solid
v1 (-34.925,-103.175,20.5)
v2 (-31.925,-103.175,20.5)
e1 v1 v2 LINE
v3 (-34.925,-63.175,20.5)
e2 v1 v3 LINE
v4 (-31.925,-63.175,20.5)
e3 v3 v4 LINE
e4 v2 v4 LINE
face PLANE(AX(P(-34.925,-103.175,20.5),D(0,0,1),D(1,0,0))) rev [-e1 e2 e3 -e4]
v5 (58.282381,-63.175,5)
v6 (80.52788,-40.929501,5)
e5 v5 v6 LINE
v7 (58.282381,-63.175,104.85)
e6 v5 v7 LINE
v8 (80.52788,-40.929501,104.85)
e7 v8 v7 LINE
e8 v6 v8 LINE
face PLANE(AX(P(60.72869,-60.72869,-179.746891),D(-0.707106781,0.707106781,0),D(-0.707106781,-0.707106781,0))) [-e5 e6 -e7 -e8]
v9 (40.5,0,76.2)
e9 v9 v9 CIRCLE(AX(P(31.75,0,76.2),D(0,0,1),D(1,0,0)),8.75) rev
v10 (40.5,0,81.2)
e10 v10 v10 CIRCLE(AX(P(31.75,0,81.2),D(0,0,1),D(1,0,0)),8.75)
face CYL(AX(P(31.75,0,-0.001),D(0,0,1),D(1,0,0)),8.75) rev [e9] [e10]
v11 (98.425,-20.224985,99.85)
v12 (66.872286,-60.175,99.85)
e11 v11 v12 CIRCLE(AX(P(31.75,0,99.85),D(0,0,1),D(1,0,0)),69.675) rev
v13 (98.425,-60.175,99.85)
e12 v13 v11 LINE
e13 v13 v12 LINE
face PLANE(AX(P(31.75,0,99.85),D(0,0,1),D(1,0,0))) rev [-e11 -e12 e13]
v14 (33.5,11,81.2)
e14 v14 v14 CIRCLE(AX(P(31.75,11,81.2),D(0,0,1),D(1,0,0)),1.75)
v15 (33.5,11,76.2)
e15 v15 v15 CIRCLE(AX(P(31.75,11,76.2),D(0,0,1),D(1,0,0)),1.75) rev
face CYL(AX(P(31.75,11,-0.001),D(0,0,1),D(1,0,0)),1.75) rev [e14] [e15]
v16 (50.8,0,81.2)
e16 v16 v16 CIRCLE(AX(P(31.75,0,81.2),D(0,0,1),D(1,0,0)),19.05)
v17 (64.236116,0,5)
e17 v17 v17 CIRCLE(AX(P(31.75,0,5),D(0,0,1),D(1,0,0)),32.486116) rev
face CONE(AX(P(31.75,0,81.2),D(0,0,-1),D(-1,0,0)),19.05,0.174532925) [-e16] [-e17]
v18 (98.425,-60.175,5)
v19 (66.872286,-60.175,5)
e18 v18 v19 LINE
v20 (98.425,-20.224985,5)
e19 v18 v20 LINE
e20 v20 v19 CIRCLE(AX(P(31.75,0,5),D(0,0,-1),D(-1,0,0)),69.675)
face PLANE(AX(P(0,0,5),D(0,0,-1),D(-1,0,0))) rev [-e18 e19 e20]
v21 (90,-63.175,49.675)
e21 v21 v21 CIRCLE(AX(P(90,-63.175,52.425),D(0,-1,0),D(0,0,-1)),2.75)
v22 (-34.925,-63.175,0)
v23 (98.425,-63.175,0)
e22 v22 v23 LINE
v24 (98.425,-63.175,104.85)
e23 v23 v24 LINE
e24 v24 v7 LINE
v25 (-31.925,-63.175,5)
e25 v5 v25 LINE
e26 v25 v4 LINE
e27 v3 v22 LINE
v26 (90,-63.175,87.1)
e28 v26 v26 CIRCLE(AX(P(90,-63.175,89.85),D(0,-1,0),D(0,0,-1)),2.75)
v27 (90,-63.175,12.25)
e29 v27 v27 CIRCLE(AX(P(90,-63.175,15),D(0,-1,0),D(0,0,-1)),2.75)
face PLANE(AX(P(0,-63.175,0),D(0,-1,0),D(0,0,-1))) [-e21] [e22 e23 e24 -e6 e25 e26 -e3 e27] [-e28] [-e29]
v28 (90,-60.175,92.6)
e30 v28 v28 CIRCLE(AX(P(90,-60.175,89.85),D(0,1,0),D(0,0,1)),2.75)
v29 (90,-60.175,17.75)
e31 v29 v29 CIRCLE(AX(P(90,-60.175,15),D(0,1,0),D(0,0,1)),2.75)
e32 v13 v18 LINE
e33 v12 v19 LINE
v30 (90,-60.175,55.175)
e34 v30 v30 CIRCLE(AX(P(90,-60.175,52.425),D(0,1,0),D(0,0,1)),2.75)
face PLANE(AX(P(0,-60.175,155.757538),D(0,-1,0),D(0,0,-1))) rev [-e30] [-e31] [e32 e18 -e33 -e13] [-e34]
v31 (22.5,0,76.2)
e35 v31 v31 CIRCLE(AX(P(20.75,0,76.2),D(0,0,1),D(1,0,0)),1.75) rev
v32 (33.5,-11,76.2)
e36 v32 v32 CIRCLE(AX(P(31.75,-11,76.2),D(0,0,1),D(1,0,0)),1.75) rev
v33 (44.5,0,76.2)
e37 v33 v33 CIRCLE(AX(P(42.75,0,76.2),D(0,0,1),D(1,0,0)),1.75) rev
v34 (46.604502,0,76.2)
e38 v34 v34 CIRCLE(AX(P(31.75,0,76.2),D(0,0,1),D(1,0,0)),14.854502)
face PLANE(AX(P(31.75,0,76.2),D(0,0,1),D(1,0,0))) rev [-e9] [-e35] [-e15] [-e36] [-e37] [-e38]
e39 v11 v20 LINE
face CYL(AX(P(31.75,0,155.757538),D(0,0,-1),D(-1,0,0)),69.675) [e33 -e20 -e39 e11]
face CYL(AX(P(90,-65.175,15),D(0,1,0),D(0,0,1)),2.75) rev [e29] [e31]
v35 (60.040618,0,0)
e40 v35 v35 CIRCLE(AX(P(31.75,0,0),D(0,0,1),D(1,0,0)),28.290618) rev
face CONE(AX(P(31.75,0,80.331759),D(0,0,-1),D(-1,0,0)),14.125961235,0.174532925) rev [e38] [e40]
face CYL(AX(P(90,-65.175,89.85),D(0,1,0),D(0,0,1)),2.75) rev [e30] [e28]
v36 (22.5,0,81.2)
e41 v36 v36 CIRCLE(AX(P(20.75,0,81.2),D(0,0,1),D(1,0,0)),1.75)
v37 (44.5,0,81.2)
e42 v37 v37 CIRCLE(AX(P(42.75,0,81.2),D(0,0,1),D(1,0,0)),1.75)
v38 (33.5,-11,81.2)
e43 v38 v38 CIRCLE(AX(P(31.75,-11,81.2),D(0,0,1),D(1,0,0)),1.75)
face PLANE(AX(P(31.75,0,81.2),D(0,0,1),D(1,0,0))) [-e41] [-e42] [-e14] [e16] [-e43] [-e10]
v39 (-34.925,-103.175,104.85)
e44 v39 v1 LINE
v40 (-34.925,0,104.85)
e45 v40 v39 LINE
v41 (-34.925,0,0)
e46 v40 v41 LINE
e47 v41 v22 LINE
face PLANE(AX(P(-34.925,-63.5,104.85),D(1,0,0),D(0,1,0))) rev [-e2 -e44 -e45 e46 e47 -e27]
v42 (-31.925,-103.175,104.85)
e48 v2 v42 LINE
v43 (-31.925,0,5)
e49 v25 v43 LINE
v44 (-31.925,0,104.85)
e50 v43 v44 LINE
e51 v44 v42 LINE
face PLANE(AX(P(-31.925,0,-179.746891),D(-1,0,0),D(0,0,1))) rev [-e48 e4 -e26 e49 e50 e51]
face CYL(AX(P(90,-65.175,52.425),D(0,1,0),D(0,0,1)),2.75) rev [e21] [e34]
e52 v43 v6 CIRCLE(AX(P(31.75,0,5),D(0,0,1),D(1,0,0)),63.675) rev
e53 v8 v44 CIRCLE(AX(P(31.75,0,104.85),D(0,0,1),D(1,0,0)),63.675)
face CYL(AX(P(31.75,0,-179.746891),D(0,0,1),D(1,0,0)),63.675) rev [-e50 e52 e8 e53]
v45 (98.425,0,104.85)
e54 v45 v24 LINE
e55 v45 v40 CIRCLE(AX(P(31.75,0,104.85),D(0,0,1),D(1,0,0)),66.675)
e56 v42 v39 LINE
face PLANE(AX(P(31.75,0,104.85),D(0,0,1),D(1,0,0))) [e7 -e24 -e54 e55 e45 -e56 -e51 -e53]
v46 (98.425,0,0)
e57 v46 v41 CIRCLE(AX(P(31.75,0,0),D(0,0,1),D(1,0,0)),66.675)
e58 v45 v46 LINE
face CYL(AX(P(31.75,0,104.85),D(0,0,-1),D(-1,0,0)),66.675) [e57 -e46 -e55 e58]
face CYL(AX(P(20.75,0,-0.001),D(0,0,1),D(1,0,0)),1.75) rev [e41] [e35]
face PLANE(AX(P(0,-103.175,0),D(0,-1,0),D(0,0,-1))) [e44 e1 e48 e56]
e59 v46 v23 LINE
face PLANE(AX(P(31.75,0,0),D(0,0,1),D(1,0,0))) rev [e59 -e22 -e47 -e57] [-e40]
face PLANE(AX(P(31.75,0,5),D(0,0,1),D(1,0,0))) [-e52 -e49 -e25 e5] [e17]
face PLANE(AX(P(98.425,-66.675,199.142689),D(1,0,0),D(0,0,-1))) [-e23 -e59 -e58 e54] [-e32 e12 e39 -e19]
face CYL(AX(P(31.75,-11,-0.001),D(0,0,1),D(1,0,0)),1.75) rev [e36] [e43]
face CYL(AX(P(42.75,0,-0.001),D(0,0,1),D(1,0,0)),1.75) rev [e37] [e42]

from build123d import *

# Parameters (mm, degrees)
BOSS_EXTRUDE1_DEPTH = 104.85
CUT_EXTRUDE1_REACH  = 178.992
CUT_EXTRUDE2_REACH  = 178.992
SKETCH3_R           = 2.665000000000001
BOSS_EXTRUDE2_DEPTH = 104.85
CUT_EXTRUDE3_REACH  = 178.992
SKETCH6_W           = 66.67499999999998
SKETCH6_H           = 36.500000000000014
CUT_EXTRUDE4_DEPTH  = 3.5
CUT_EXTRUDE5_DEPTH  = 94.850000094
SKETCH9_R           = 2.7500000000000084
SKETCH9_R_2         = 2.750000000000008
CUT_EXTRUDE6_DEPTH  = 5
CUT_EXTRUDE7_DEPTH  = 99.85
BOSS_EXTRUDE3_DEPTH = 40
SKETCH12_R          = 19.05
BOSS_EXTRUDE4_DEPTH = 76.2
CHAMFER1_SIZE       = 13.43611593
CHAMFER1_SIZE_2     = 76.2
CUT_EXTRUDE8_REACH  = 166.091
SKETCH13_R          = 8.750000000000004
CUT_EXTRUDE9_REACH  = 166.091
SKETCH14_R          = 1.7500000000000038
SKETCH14_R_2        = 1.7500000000000067
SKETCH14_R_3        = 1.7499999999999987


# Read off the part's stored shape, not the designer's step: Shell1
with BuildPart() as part:
    # Sketch1 → Boss-Extrude1 (new body)
    with BuildSketch(Plane.XY):
        with BuildLine():
            Line((-34.925, 0), (-34.92499999999999, -63.5))
            Line((-34.92499999999999, -63.5), (-34.92499999999998, -103.175))
            Line((-34.92499999999998, -103.175), (98.425, -103.175))
            Line((98.425, -103.175), (98.42499999999998, -64.83388883768319))
            Line((98.42499999999998, -64.83388883768319), (98.425, 0))
            ThreePointArc((98.425, 0), (31.750000000000004, 66.675), (-34.925, 0))
        make_face()
    extrude(amount=BOSS_EXTRUDE1_DEPTH)

    # Sketch2 → Cut-Extrude1 (cut, up to next)
    with BuildSketch(Plane.XY.offset(104.85), mode=Mode.PRIVATE) as cut_extrude1_sk1:
        with BuildLine():
            Line((31.75, -66.675), (31.75, -103.175))
            Line((31.75, -103.175), (98.425, -103.175))
            Line((98.425, -103.175), (98.425, 0))
            ThreePointArc((98.425, 0), (78.89634463561305, -47.14634463561305), (31.75, -66.675))
        make_face()
    cut_extrude1_tool1 = extrude(cut_extrude1_sk1.sketch, amount=-CUT_EXTRUDE1_REACH, mode=Mode.PRIVATE) & part.part
    add(cut_extrude1_tool1.solids().sort_by_distance((70.281775, -75.59134, 104.85))[0], mode=Mode.SUBTRACT)

    # Sketch3 → Cut-Extrude2 (cut, up to next)
    with BuildSketch(Plane(origin=(0, 0, 0), x_dir=(-1, 0, 0), z_dir=(0, 0, -1)), mode=Mode.PRIVATE) as cut_extrude2_sk1:
        with Locations((-21.75, -93.17500000000001)):
            Circle(SKETCH3_R)
    cut_extrude2_tool1 = extrude(cut_extrude2_sk1.sketch, amount=-CUT_EXTRUDE2_REACH, mode=Mode.PRIVATE) & part.part
    # Sketch3 → Cut-Extrude2 (cut, up to next)
    with BuildSketch(Plane(origin=(0, 0, 0), x_dir=(-1, 0, 0), z_dir=(0, 0, -1)), mode=Mode.PRIVATE) as cut_extrude2_sk2:
        with Locations(Location((-21.75, -73.17499999999998, 0), (0, 0, 180))):
            Circle(SKETCH3_R)
    cut_extrude2_tool2 = extrude(cut_extrude2_sk2.sketch, amount=-CUT_EXTRUDE2_REACH, mode=Mode.PRIVATE) & part.part
    # Sketch3 → Cut-Extrude2 (cut, up to next)
    with BuildSketch(Plane(origin=(0, 0, 0), x_dir=(-1, 0, 0), z_dir=(0, 0, -1)), mode=Mode.PRIVATE) as cut_extrude2_sk3:
        with Locations(Location((24.924999999999997, -93.17500000000001, 0), (0, 0, 180))):
            Circle(SKETCH3_R)
    cut_extrude2_tool3 = extrude(cut_extrude2_sk3.sketch, amount=-CUT_EXTRUDE2_REACH, mode=Mode.PRIVATE) & part.part
    # Sketch3 → Cut-Extrude2 (cut, up to next)
    with BuildSketch(Plane(origin=(0, 0, 0), x_dir=(-1, 0, 0), z_dir=(0, 0, -1)), mode=Mode.PRIVATE) as cut_extrude2_sk4:
        with Locations((24.924999999999997, -73.17499999999998)):
            Circle(SKETCH3_R)
    cut_extrude2_tool4 = extrude(cut_extrude2_sk4.sketch, amount=-CUT_EXTRUDE2_REACH, mode=Mode.PRIVATE) & part.part
    add(cut_extrude2_tool1.solids().sort_by_distance((21.75, -93.175, 0))[0], mode=Mode.SUBTRACT)
    add(cut_extrude2_tool2.solids().sort_by_distance((21.75, -73.175, 0))[0], mode=Mode.SUBTRACT)
    add(cut_extrude2_tool3.solids().sort_by_distance((-24.925, -93.175, 0))[0], mode=Mode.SUBTRACT)
    add(cut_extrude2_tool4.solids().sort_by_distance((-24.925, -73.175, 0))[0], mode=Mode.SUBTRACT)

    # Sketch5 → Boss-Extrude2 (add)
    with BuildSketch(Plane(origin=(0, 0, 0), x_dir=(-1, 0, 0), z_dir=(0, 0, -1))):
        with BuildLine():
            Line((-31.75, -66.675), (-98.425, -66.675))
            Line((-98.425, -66.675), (-98.425, -4.6559e-13))
            ThreePointArc((-98.425, -4.6559e-13), (-78.89634463561288, -47.146344635613225), (-31.75, -66.675))
        make_face()
    extrude(amount=-BOSS_EXTRUDE2_DEPTH)

    # Sketch6 → Cut-Extrude3 (cut, up to next)
    with BuildSketch(Plane(origin=(0, 0, 0), x_dir=(-1, 0, 0), z_dir=(0, 0, -1)), mode=Mode.PRIVATE) as cut_extrude3_sk1:
        with Locations((1.5874999999999897, -84.92500000000001)):
            Rectangle(SKETCH6_W, SKETCH6_H)
    cut_extrude3_tool1 = extrude(cut_extrude3_sk1.sketch, amount=-CUT_EXTRUDE3_REACH, mode=Mode.PRIVATE) & part.part
    add(cut_extrude3_tool1.solids().sort_by_distance((-1.5875, -84.925, 0))[0], mode=Mode.SUBTRACT)

    # Sketch7 → Cut-Extrude4 (cut)
    with BuildSketch(Plane.XZ.offset(66.675)):
        Polygon((98.425, 0), (98.425, 104.85), (-34.92499999999999, 104.85), (-34.92499999999998, 0), align=None)
    extrude(amount=-CUT_EXTRUDE4_DEPTH, mode=Mode.SUBTRACT)

    # Sketch8 → Cut-Extrude5 (cut)
    with BuildSketch(Plane(origin=(0, 0, 4.999999905999999), x_dir=(-1, 0, 0), z_dir=(0, 0, -1))):
        with BuildLine():
            Line((-98.425, -20.224984548819855), (-98.425, -60.17499999999999))
            Line((-98.425, -60.17499999999999), (-66.87228637204589, -60.17499999999999))
            ThreePointArc((-66.87228637204589, -60.17500000000001), (-86.42790057980886, -43.18486787272293), (-98.42499999999998, -20.224984548819855))
        make_face()
    extrude(amount=-CUT_EXTRUDE5_DEPTH, mode=Mode.SUBTRACT)

    # Sketch9 → Cut-Extrude6 (cut)
    with BuildSketch(Plane(origin=(0, -60.17499999999999, 0), x_dir=(1, 0, 0), z_dir=(0, 1, 0))):
        with Locations(Location((89.99999999999999, -89.85, 0), (0, 0, 270))):
            Circle(SKETCH9_R)
        with Locations(Location((89.99999999999999, -14.999999906000001, 0), (0, 0, 270))):
            Circle(SKETCH9_R_2)
        with Locations(Location((89.99999999999999, -52.42499995300001, 0), (0, 0, 270))):
            Circle(SKETCH9_R)
    extrude(amount=-CUT_EXTRUDE6_DEPTH, mode=Mode.SUBTRACT)

    # Sketch10 → Cut-Extrude7 (cut)
    with BuildSketch(Plane.XY.offset(104.85)):
        with BuildLine():
            Line((58.2823809623914, -63.175), (80.527879915601, -40.92950104679029))
            ThreePointArc((80.527879915601, -40.92950104679029), (91.58492762854266, -21.778132626262114), (95.425, -4.6274e-13))
            ThreePointArc((95.42499999999998, -4.6803e-13), (31.75000000000024, 63.67499999999998), (-31.92499999999999, 1.274e-14))
            Line((-31.924999999999994, 7.8e-15), (-31.924999999999994, -63.175))
            Line((-31.924999999999994, -63.175), (31.750000000000004, -63.175))
            Line((31.75, -63.175), (58.2823809623914, -63.175))
        make_face()
    extrude(amount=-CUT_EXTRUDE7_DEPTH, mode=Mode.SUBTRACT)

    # Sketch11 → Boss-Extrude3 (add)
    with BuildSketch(Plane.XZ.offset(63.175)):
        Polygon((-34.92499999999999, 104.85), (-31.924999999999994, 104.85), (-31.924999999999994, 20.5), (-34.92499999999998, 20.5), align=None)
    extrude(amount=BOSS_EXTRUDE3_DEPTH)

    # Sketch12 → Boss-Extrude4 (add)
    with BuildSketch(Plane.XY.offset(5)):
        with Locations(Location((31.75, 0, 0), (0, 0, 180))):
            Circle(SKETCH12_R)
    extrude(amount=BOSS_EXTRUDE4_DEPTH)

    # Chamfer1
    # the kernel refuses this chamfer: 76.2, 13.43611593 mm, written as the material it adds along each edge
    with BuildSketch(Plane(origin=(31.75, 0, 5), x_dir=(-1, 1.2e-16, 0), z_dir=(1.2e-16, 1, 0))) as chamfer1_piece_1_section:
        Polygon((19.05 + CHAMFER1_SIZE, 0), (19.05, CHAMFER1_SIZE_2), (19.05, 0), align=None)
    chamfer1_piece_1 = revolve(axis=Axis((31.75, 0, 5), (0, 0, 1)), mode=Mode.PRIVATE)
    chamfer1_piece_1 = split(chamfer1_piece_1, bisect_by=Plane(origin=(57.33414853673409, -6.27e-15, 81.2), z_dir=(0, 0, -1)), keep=Keep.TOP, mode=Mode.PRIVATE)
    add(chamfer1_piece_1)

    # Shell1 outline → Shell1 (revolve, cut)
    with BuildSketch(Plane(origin=(31.75, 0, 0), x_dir=(1, 0, 0), z_dir=(0, -1, 0))):
        Polygon((14.854501844, 76.2), (0, 76.2), (0, 0), (28.290617774, 0), align=None)
    revolve(axis=Axis((31.75, 0, 0), (0, 0, 1)), mode=Mode.SUBTRACT)

    # Sketch13 → Cut-Extrude8 (cut, up to next)
    with BuildSketch(Plane.XY.offset(81.2), mode=Mode.PRIVATE) as cut_extrude8_sk1:
        with Locations((31.75, 0)):
            Circle(SKETCH13_R)
    cut_extrude8_tool1 = extrude(cut_extrude8_sk1.sketch, amount=-CUT_EXTRUDE8_REACH, mode=Mode.PRIVATE) & part.part
    add(cut_extrude8_tool1.solids().sort_by_distance((31.75, 0, 81.2))[0], mode=Mode.SUBTRACT)

    # Sketch14 → Cut-Extrude9 (cut, up to next)
    with BuildSketch(Plane.XY.offset(81.2), mode=Mode.PRIVATE) as cut_extrude9_sk1:
        with Locations((31.75, 10.999999999999993)):
            Circle(SKETCH14_R)
    cut_extrude9_tool1 = extrude(cut_extrude9_sk1.sketch, amount=-CUT_EXTRUDE9_REACH, mode=Mode.PRIVATE) & part.part
    # Sketch14 → Cut-Extrude9 (cut, up to next)
    with BuildSketch(Plane.XY.offset(81.2), mode=Mode.PRIVATE) as cut_extrude9_sk2:
        with Locations((42.75000000000015, 1.1102e-13)):
            Circle(SKETCH14_R)
    cut_extrude9_tool2 = extrude(cut_extrude9_sk2.sketch, amount=-CUT_EXTRUDE9_REACH, mode=Mode.PRIVATE) & part.part
    # Sketch14 → Cut-Extrude9 (cut, up to next)
    with BuildSketch(Plane.XY.offset(81.2), mode=Mode.PRIVATE) as cut_extrude9_sk3:
        with Locations((31.75000000000024, -10.999999999999993)):
            Circle(SKETCH14_R_2)
    cut_extrude9_tool3 = extrude(cut_extrude9_sk3.sketch, amount=-CUT_EXTRUDE9_REACH, mode=Mode.PRIVATE) & part.part
    # Sketch14 → Cut-Extrude9 (cut, up to next)
    with BuildSketch(Plane.XY.offset(81.2), mode=Mode.PRIVATE) as cut_extrude9_sk4:
        with Locations((20.75000000000016, -3.469e-14)):
            Circle(SKETCH14_R_3)
    cut_extrude9_tool4 = extrude(cut_extrude9_sk4.sketch, amount=-CUT_EXTRUDE9_REACH, mode=Mode.PRIVATE) & part.part
    add(cut_extrude9_tool1.solids().sort_by_distance((31.75, 11, 81.2))[0], mode=Mode.SUBTRACT)
    add(cut_extrude9_tool2.solids().sort_by_distance((42.75, 0, 81.2))[0], mode=Mode.SUBTRACT)
    add(cut_extrude9_tool3.solids().sort_by_distance((31.75, -11, 81.2))[0], mode=Mode.SUBTRACT)
    add(cut_extrude9_tool4.solids().sort_by_distance((20.75, 0, 81.2))[0], mode=Mode.SUBTRACT)


solid = part.part
